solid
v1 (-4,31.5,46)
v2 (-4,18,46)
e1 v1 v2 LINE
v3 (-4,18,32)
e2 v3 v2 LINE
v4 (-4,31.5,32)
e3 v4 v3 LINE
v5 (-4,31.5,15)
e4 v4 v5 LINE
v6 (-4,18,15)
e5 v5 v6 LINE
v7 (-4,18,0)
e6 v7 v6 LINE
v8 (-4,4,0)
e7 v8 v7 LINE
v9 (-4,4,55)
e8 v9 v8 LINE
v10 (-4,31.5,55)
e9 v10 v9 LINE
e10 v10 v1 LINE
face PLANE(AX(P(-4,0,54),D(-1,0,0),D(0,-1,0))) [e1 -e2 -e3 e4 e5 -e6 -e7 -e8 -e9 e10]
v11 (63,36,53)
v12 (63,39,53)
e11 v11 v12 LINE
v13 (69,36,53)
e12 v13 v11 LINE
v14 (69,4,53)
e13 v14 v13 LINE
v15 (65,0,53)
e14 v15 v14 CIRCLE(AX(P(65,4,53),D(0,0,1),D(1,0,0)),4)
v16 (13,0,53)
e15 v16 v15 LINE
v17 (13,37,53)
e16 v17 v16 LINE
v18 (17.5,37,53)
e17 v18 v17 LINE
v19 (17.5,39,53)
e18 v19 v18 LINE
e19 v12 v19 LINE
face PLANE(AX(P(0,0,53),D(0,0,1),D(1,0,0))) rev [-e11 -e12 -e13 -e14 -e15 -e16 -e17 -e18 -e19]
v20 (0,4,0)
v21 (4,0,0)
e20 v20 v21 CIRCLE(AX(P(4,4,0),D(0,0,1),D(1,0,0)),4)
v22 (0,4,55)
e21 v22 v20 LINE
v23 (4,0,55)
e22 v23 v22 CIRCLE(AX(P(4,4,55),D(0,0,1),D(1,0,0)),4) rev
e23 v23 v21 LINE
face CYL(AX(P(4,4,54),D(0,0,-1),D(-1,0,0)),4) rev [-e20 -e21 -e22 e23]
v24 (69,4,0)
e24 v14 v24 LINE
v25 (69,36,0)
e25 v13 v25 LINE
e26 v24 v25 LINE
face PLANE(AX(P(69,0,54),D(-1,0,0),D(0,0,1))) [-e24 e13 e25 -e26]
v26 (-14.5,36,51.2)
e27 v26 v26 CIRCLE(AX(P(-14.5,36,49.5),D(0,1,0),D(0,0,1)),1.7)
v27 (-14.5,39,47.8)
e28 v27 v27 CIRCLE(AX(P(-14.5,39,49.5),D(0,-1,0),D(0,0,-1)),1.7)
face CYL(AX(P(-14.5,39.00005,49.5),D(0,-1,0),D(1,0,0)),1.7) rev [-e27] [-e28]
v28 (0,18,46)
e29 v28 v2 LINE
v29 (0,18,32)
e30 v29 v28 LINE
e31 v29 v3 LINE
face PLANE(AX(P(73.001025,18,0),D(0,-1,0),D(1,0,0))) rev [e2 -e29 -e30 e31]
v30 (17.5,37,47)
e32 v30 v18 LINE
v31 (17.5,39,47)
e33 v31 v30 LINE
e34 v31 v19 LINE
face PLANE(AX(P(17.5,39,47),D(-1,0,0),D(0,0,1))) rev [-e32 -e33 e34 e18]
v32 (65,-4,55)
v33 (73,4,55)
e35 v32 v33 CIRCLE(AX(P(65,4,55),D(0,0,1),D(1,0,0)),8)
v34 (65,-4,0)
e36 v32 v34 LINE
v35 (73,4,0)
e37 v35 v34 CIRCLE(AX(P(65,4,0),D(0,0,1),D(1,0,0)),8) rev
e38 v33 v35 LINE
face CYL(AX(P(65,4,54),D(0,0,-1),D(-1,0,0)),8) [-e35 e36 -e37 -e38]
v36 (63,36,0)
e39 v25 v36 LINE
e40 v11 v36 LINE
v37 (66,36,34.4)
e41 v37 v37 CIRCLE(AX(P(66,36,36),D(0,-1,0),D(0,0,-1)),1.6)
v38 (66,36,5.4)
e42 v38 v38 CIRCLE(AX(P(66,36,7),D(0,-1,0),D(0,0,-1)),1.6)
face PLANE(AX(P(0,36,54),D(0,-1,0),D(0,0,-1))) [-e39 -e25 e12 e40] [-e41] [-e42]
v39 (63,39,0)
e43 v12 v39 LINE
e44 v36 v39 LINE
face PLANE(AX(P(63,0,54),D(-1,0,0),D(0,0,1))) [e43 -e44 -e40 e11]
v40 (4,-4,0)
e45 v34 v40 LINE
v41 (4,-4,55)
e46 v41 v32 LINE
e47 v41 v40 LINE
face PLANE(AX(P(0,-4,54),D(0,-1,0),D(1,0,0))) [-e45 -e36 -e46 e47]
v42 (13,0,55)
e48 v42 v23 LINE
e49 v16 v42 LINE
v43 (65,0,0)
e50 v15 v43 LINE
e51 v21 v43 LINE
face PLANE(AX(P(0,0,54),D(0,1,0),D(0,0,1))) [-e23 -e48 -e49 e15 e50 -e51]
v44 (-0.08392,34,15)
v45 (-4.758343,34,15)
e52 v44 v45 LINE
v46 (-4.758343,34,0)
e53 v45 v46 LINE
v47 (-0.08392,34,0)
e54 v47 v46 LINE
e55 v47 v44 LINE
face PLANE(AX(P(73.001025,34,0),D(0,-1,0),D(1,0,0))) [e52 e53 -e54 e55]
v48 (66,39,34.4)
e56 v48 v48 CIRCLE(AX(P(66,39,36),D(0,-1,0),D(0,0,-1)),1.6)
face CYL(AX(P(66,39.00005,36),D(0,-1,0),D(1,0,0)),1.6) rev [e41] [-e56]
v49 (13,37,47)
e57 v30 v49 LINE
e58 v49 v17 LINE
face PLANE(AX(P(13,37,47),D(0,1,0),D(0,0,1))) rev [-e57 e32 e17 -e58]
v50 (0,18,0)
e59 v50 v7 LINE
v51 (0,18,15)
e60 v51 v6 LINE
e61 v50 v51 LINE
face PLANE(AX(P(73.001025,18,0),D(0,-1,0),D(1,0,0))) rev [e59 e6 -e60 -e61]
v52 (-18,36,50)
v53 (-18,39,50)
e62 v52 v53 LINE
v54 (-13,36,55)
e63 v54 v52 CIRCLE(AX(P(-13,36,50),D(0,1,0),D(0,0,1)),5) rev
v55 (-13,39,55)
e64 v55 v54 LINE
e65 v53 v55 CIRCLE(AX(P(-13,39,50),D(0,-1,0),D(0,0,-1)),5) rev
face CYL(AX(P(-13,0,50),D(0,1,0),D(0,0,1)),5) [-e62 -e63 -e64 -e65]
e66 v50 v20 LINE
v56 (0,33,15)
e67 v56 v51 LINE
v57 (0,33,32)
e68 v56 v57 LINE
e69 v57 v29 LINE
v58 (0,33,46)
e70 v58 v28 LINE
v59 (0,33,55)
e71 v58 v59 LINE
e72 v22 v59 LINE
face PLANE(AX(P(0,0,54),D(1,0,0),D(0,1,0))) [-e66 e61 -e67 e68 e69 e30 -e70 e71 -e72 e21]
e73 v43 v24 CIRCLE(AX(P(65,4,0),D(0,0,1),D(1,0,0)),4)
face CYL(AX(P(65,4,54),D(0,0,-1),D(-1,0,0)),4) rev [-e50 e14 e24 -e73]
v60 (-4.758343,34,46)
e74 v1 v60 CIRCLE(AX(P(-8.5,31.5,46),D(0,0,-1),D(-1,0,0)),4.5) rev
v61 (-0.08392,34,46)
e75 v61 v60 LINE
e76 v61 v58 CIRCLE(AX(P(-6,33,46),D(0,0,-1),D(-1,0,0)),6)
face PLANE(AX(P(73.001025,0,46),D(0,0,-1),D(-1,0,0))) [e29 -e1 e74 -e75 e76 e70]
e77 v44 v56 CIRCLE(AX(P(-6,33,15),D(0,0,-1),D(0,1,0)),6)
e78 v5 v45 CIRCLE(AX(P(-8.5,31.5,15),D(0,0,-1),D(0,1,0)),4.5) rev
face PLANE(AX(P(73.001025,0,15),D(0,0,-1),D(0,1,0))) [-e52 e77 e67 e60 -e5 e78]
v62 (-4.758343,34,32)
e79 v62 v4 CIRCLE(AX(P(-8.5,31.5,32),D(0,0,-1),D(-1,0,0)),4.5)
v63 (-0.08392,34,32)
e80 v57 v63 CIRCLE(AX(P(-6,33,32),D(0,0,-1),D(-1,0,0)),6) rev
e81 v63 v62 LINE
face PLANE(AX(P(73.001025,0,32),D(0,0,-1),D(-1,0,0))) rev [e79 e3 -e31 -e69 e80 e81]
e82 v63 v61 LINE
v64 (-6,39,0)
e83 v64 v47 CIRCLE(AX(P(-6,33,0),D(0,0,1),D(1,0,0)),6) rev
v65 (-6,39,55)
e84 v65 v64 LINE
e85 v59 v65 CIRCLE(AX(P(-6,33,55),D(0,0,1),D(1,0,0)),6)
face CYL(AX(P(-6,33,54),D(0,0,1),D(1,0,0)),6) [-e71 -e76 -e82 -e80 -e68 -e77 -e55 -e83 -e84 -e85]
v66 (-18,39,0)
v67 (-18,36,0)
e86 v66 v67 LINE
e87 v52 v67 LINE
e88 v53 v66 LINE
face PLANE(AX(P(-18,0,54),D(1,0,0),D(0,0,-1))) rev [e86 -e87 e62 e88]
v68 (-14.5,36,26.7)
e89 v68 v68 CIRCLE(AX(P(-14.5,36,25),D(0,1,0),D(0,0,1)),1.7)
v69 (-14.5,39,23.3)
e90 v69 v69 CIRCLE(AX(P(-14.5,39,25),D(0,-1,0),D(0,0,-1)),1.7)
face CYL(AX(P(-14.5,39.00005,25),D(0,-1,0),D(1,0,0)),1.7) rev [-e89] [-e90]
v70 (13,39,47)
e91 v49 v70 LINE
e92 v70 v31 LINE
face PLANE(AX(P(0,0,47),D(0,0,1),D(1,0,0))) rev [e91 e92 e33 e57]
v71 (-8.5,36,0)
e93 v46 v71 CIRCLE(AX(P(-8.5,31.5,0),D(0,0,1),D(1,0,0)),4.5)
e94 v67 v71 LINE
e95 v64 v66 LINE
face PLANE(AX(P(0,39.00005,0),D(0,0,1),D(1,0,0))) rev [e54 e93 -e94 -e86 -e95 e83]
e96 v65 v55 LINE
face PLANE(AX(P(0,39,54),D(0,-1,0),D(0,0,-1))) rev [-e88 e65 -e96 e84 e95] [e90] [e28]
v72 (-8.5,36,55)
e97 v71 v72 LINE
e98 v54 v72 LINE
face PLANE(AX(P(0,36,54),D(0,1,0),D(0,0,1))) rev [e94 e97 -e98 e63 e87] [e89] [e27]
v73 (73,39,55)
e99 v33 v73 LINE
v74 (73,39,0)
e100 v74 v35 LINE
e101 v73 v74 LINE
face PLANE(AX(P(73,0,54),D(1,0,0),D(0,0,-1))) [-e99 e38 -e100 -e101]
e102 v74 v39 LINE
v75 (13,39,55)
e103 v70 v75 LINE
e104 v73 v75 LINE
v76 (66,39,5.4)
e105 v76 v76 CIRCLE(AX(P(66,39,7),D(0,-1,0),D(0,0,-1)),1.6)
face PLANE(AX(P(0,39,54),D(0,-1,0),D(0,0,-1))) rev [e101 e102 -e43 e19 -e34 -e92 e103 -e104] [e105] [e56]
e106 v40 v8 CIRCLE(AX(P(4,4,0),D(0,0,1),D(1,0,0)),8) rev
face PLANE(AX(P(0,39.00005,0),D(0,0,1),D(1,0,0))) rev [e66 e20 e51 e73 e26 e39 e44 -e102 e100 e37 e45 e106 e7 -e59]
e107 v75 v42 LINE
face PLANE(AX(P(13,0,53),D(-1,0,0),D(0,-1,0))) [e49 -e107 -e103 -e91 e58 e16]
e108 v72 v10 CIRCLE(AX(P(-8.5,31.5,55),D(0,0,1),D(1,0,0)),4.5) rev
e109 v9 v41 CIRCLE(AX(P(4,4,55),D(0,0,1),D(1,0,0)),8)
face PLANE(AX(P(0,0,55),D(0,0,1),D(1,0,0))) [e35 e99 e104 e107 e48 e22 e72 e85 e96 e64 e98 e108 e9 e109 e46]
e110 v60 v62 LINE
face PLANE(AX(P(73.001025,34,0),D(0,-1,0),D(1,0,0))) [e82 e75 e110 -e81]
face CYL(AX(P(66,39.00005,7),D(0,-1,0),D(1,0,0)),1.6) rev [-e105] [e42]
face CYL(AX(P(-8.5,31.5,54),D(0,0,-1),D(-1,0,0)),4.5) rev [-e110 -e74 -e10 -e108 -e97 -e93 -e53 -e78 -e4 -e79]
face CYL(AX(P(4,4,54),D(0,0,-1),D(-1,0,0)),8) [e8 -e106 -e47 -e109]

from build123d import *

# Parameters (mm, degrees)
EXTRUDE_1_DEPTH      = 54
EXTRUDE_START        = -2
EXTRUDE_2_DEPTH      = 2
SKETCH_2_R           = 1.7
SKETCH_2_W           = 14
SKETCH_2_H           = 2
SKETCH_2_W_2         = 8
SKETCH_2_W_3         = 61
CUT_EXTRUDE_1_DEPTH  = 101.468900661
CUT_EXTRUDE_2_REACH  = 103.814
SKETCH_3_W           = 15
SKETCH_3_H           = 16
SKETCH_3_W_2         = 14
CUT_EXTRUDE_START    = -40
CUT_EXTRUDE_5_DEPTH  = 61.468900661
EXTRUDE_3_DEPTH      = 1
EXTRUDE_3_DEPTH_BACK = 1
SKETCH_6_W           = 4.5
SKETCH_6_H           = 2
EXTRUDE_4_DEPTH      = 6
FILLET_1_R           = 4.5
FILLET_2_R           = 6
FILLET_3_R           = 5


with BuildPart() as part:
    # 草图1 → 凸台-拉伸1 (new body)
    with BuildSketch(Plane.XY):
        with BuildLine():
            ThreePointArc((4, -4), (-1.656854249, -1.656854249), (-4, 4))
            Line((-4, 4), (-4, 36))
            Line((-4, 36), (-18, 36))
            Line((-18, 36), (-18, 39))
            Line((-18, 39), (0, 39))
            Line((0, 39), (0, 4))
            ThreePointArc((0, 4), (1.171572875, 1.171572875), (4, 0))
            Line((4, 0), (65, 0))
            ThreePointArc((65, 0), (67.828427125, 1.171572875), (69, 4))
            Line((69, 4), (69, 36))
            Line((69, 36), (63, 36))
            Line((63, 36), (63, 39))
            Line((63, 39), (73, 39))
            Line((73, 39), (73, 4))
            ThreePointArc((73, 4), (70.656854249, -1.656854249), (65, -4))
            Line((65, -4), (4, -4))
        make_face()
    extrude(amount=EXTRUDE_1_DEPTH)

    # 草图1<3> → 凸台-拉伸2 (add)
    with BuildSketch(Plane.XY.offset(EXTRUDE_START)):
        with BuildLine():
            Line((4, 0), (65, 0))
            ThreePointArc((65, 0), (67.828427125, 1.171572875), (69, 4))
            Line((69, 4), (69, 36))
            Line((69, 36), (63, 36))
            Line((63, 36), (63, 39))
            Line((63, 39), (0, 39))
            Line((0, 39), (0, 4))
            ThreePointArc((0, 4), (1.171572875, 1.171572875), (4, 0))
        make_face()
        with BuildLine():
            ThreePointArc((4, -4), (-1.656854249, -1.656854249), (-4, 4))
            Line((-4, 4), (-4, 36))
            Line((-4, 36), (-18, 36))
            Line((-18, 36), (-18, 39))
            Line((-18, 39), (0, 39))
            Line((0, 39), (0, 4))
            ThreePointArc((0, 4), (1.171572875, 1.171572875), (4, 0))
            Line((4, 0), (65, 0))
            ThreePointArc((65, 0), (67.828427125, 1.171572875), (69, 4))
            Line((69, 4), (69, 36))
            Line((69, 36), (63, 36))
            Line((63, 36), (63, 39))
            Line((63, 39), (73, 39))
            Line((73, 39), (73, 4))
            ThreePointArc((73, 4), (70.656854249, -1.656854249), (65, -4))
            Line((65, -4), (4, -4))
        make_face()
    extrude(amount=EXTRUDE_2_DEPTH)

    # 草图2 → 切除-拉伸1 (cut, through all)
    with BuildSketch(Plane.XZ.offset(4)):
        with Locations(Location((-14.5, 49.5, 0), (0, 0, 90))):
            Circle(SKETCH_2_R)
        with Locations(Location((-14.5, 25, 0), (0, 0, 90))):
            Circle(SKETCH_2_R)
        with Locations((-11, -1)):
            Rectangle(SKETCH_2_W, SKETCH_2_H)
        with Locations((0, -1)):
            Rectangle(SKETCH_2_W_2, SKETCH_2_H)
        with Locations((34.5, -1)):
            Rectangle(SKETCH_2_W_3, SKETCH_2_H)
        with Locations((69, -1)):
            Rectangle(SKETCH_2_W_2, SKETCH_2_H)
    extrude(amount=-CUT_EXTRUDE_1_DEPTH, mode=Mode.SUBTRACT)

    # 草图3 → 切除-拉伸2 (cut, up to next)
    with BuildSketch(Plane.ZY.offset(4), mode=Mode.PRIVATE) as cut_extrude_2_sk1:
        with Locations((7.5, 26)):
            Rectangle(SKETCH_3_W, SKETCH_3_H)
    cut_extrude_2_tool1 = extrude(cut_extrude_2_sk1.sketch, amount=-CUT_EXTRUDE_2_REACH, mode=Mode.PRIVATE) & part.part
    # 草图3 → 切除-拉伸2 (cut, up to next)
    with BuildSketch(Plane.ZY.offset(4), mode=Mode.PRIVATE) as cut_extrude_2_sk2:
        with Locations((39, 26)):
            Rectangle(SKETCH_3_W_2, SKETCH_3_H)
    cut_extrude_2_tool2 = extrude(cut_extrude_2_sk2.sketch, amount=-CUT_EXTRUDE_2_REACH, mode=Mode.PRIVATE) & part.part
    add(cut_extrude_2_tool1.solids().sort_by_distance((-4, 26, 7.5))[0], mode=Mode.SUBTRACT)
    add(cut_extrude_2_tool2.solids().sort_by_distance((-4, 26, 39))[0], mode=Mode.SUBTRACT)

    # 草图2<3> → 切除-拉伸5 (cut, through all)
    with BuildSketch(Plane.XZ.offset(4).offset(CUT_EXTRUDE_START)):
        with BuildLine():
            ThreePointArc((65, 37.2489996), (64.4, 36), (65, 34.7510004))
            Line((65, 34.7510004), (65, 37.2489996))
        make_face()
        with BuildLine():
            Line((65, 37.2489996), (65, 34.7510004))
            ThreePointArc((65, 34.7510004), (66.692820323, 34.55777949), (67.6, 36))
            ThreePointArc((67.6, 36), (66.692820323, 37.44222051), (65, 37.2489996))
        make_face()
        with BuildLine():
            ThreePointArc((65, 8.2489996), (64.4, 7), (65, 5.7510004))
            Line((65, 5.7510004), (65, 8.2489996))
        make_face()
        with BuildLine():
            Line((65, 8.2489996), (65, 5.7510004))
            ThreePointArc((65, 5.7510004), (66.692820323, 5.55777949), (67.6, 7))
            ThreePointArc((67.6, 7), (66.692820323, 8.44222051), (65, 8.2489996))
        make_face()
    extrude(amount=-CUT_EXTRUDE_5_DEPTH, mode=Mode.SUBTRACT)

    # 草图5 → 凸台-拉伸3 (add, two sides: drawn at the far end of the back side and taken through both)
    with BuildSketch(Plane.XY.offset(54).offset(-EXTRUDE_3_DEPTH_BACK)):
        with BuildLine():
            Line((73, 39), (63, 39))
            Line((63, 39), (63, 36))
            Line((63, 36), (69, 36))
            Line((69, 36), (69, 4))
            ThreePointArc((69, 4), (67.828427125, 1.171572875), (65, 0))
            Line((65, 0), (13, 0))
            Line((13, 0), (13, -4))
            Line((13, -4), (65, -4))
            ThreePointArc((65, -4), (70.656854249, -1.656854249), (73, 4))
            Line((73, 4), (73, 39))
        make_face()
        with BuildLine():
            Line((63, 39), (13, 39))
            Line((13, 39), (13, 0))
            Line((13, 0), (65, 0))
            ThreePointArc((65, 0), (67.828427125, 1.171572875), (69, 4))
            Line((69, 4), (69, 36))
            Line((69, 36), (63, 36))
            Line((63, 36), (63, 39))
        make_face()
        with BuildLine():
            Line((0, 4), (0, 39))
            Line((0, 39), (-18, 39))
            Line((-18, 39), (-18, 36))
            Line((-18, 36), (-4, 36))
            Line((-4, 36), (-4, 4))
            ThreePointArc((-4, 4), (-1.656854249, -1.656854249), (4, -4))
            Line((4, -4), (13, -4))
            Line((13, -4), (13, 0))
            Line((13, 0), (4, 0))
            ThreePointArc((4, 0), (1.171572875, 1.171572875), (0, 4))
        make_face()
    extrude(amount=EXTRUDE_3_DEPTH + EXTRUDE_3_DEPTH_BACK)

    # 草图6 → 凸台-拉伸4 (add)
    with BuildSketch(Plane(origin=(0, 0, 53), x_dir=(-1, 0, 0), z_dir=(0, 0, -1))):
        with Locations((-15.25, 38)):
            Rectangle(SKETCH_6_W, SKETCH_6_H)
    extrude(amount=EXTRUDE_4_DEPTH)

    # 圆角1
    # the kernel refuses this fillet: 4.5 mm, written as the material it adds along each edge
    with BuildSketch(Plane(origin=(-4, 36, 55), x_dir=(0, -1, 0), z_dir=(0, 0, -1))) as fillet_1_piece_1_section:
        with BuildLine():
            CenterArc((FILLET_1_R, FILLET_1_R), FILLET_1_R, 180, 90)
            Line((0, FILLET_1_R), (0, 0))
            Line((0, 0), (FILLET_1_R, 0))
        make_face()
    fillet_1_piece_1 = extrude(amount=55, mode=Mode.PRIVATE)
    fillet_1_piece_1 = split(fillet_1_piece_1, bisect_by=Plane(origin=(-4.151275194, 34, 50.5), z_dir=(0, -1, 0)), keep=Keep.TOP, mode=Mode.PRIVATE)
    fillet_1_piece_1 = split(fillet_1_piece_1, bisect_by=Plane(origin=(-4.151275194, 33.214431026, 46), z_dir=(0, 0, 1)), keep=Keep.TOP, mode=Mode.PRIVATE)
    add(fillet_1_piece_1)
    with BuildSketch(Plane(origin=(-4, 36, 55), x_dir=(0, -1, 0), z_dir=(0, 0, -1))) as fillet_1_piece_2_section:
        with BuildLine():
            CenterArc((FILLET_1_R, FILLET_1_R), FILLET_1_R, 180, 90)
            Line((0, FILLET_1_R), (0, 0))
            Line((0, 0), (FILLET_1_R, 0))
        make_face()
    fillet_1_piece_2 = extrude(amount=55, mode=Mode.PRIVATE)
    fillet_1_piece_2 = split(fillet_1_piece_2, bisect_by=Plane(origin=(-5.185873222, 34, 50.5), z_dir=(0, 1, 0)), keep=Keep.TOP, mode=Mode.PRIVATE)
    fillet_1_piece_2 = split(fillet_1_piece_2, bisect_by=Plane(origin=(-5.185873222, 35.321534772, 46), z_dir=(0, 0, 1)), keep=Keep.TOP, mode=Mode.PRIVATE)
    add(fillet_1_piece_2)
    with BuildSketch(Plane(origin=(-4, 36, 55), x_dir=(0, -1, 0), z_dir=(0, 0, -1))) as fillet_1_piece_3_section:
        with BuildLine():
            CenterArc((FILLET_1_R, FILLET_1_R), FILLET_1_R, 180, 90)
            Line((0, FILLET_1_R), (0, 0))
            Line((0, 0), (FILLET_1_R, 0))
        make_face()
    fillet_1_piece_3 = extrude(amount=55, mode=Mode.PRIVATE)
    fillet_1_piece_3 = split(fillet_1_piece_3, bisect_by=Plane(origin=(-5.185873222, 34, 39), z_dir=(0, 1, 0)), keep=Keep.TOP, mode=Mode.PRIVATE)
    fillet_1_piece_3 = split(fillet_1_piece_3, bisect_by=Plane(origin=(-5.185873222, 35.321534772, 46), z_dir=(0, 0, -1)), keep=Keep.TOP, mode=Mode.PRIVATE)
    fillet_1_piece_3 = split(fillet_1_piece_3, bisect_by=Plane(origin=(-5.185873222, 35.321534772, 32), z_dir=(0, 0, 1)), keep=Keep.TOP, mode=Mode.PRIVATE)
    add(fillet_1_piece_3)
    with BuildSketch(Plane(origin=(-4, 36, 55), x_dir=(0, -1, 0), z_dir=(0, 0, -1))) as fillet_1_piece_4_section:
        with BuildLine():
            CenterArc((FILLET_1_R, FILLET_1_R), FILLET_1_R, 180, 90)
            Line((0, FILLET_1_R), (0, 0))
            Line((0, 0), (FILLET_1_R, 0))
        make_face()
    fillet_1_piece_4 = extrude(amount=55, mode=Mode.PRIVATE)
    fillet_1_piece_4 = split(fillet_1_piece_4, bisect_by=Plane(origin=(-4.151275194, 34, 23.5), z_dir=(0, -1, 0)), keep=Keep.TOP, mode=Mode.PRIVATE)
    fillet_1_piece_4 = split(fillet_1_piece_4, bisect_by=Plane(origin=(-4.151275194, 33.214431026, 15), z_dir=(0, 0, 1)), keep=Keep.TOP, mode=Mode.PRIVATE)
    fillet_1_piece_4 = split(fillet_1_piece_4, bisect_by=Plane(origin=(-4.151275194, 33.214431026, 32), z_dir=(0, 0, -1)), keep=Keep.TOP, mode=Mode.PRIVATE)
    add(fillet_1_piece_4)
    with BuildSketch(Plane(origin=(-4, 36, 55), x_dir=(0, -1, 0), z_dir=(0, 0, -1))) as fillet_1_piece_5_section:
        with BuildLine():
            CenterArc((FILLET_1_R, FILLET_1_R), FILLET_1_R, 180, 90)
            Line((0, FILLET_1_R), (0, 0))
            Line((0, 0), (FILLET_1_R, 0))
        make_face()
    fillet_1_piece_5 = extrude(amount=55, mode=Mode.PRIVATE)
    fillet_1_piece_5 = split(fillet_1_piece_5, bisect_by=Plane(origin=(-5.185873222, 34, 23.5), z_dir=(0, 1, 0)), keep=Keep.TOP, mode=Mode.PRIVATE)
    fillet_1_piece_5 = split(fillet_1_piece_5, bisect_by=Plane(origin=(-5.185873222, 35.321534772, 15), z_dir=(0, 0, 1)), keep=Keep.TOP, mode=Mode.PRIVATE)
    fillet_1_piece_5 = split(fillet_1_piece_5, bisect_by=Plane(origin=(-5.185873222, 35.321534772, 32), z_dir=(0, 0, -1)), keep=Keep.TOP, mode=Mode.PRIVATE)
    add(fillet_1_piece_5)
    with BuildSketch(Plane(origin=(-4, 36, 55), x_dir=(0, -1, 0), z_dir=(0, 0, -1))) as fillet_1_piece_6_section:
        with BuildLine():
            CenterArc((FILLET_1_R, FILLET_1_R), FILLET_1_R, 180, 90)
            Line((0, FILLET_1_R), (0, 0))
            Line((0, 0), (FILLET_1_R, 0))
        make_face()
    fillet_1_piece_6 = extrude(amount=55, mode=Mode.PRIVATE)
    fillet_1_piece_6 = split(fillet_1_piece_6, bisect_by=Plane(origin=(-5.185873222, 34, 7.5), z_dir=(0, 1, 0)), keep=Keep.TOP, mode=Mode.PRIVATE)
    fillet_1_piece_6 = split(fillet_1_piece_6, bisect_by=Plane(origin=(-5.185873222, 35.321534772, 15), z_dir=(0, 0, -1)), keep=Keep.TOP, mode=Mode.PRIVATE)
    add(fillet_1_piece_6)

    # 圆角2
    # the kernel refuses this fillet: 6 mm, written as the material it takes off along each edge
    with BuildSketch(Plane(origin=(0, 39, -15), x_dir=(-1, 0, 0), z_dir=(0, 0, 1))) as fillet_2_piece_1:
        with BuildLine():
            CenterArc((FILLET_2_R, FILLET_2_R), FILLET_2_R, 180, 90)
            Line((0, FILLET_2_R), (0, 0))
            Line((0, 0), (FILLET_2_R, 0))
        make_face()
    extrude(amount=85, mode=Mode.SUBTRACT)

    # 圆角3
    fillet_3_edges = [part.edges().sort_by_distance(p)[0] for p in [
        (-18, 37.5, 55),
    ]]
    fillet(fillet_3_edges, radius=FILLET_3_R)


solid = part.part
